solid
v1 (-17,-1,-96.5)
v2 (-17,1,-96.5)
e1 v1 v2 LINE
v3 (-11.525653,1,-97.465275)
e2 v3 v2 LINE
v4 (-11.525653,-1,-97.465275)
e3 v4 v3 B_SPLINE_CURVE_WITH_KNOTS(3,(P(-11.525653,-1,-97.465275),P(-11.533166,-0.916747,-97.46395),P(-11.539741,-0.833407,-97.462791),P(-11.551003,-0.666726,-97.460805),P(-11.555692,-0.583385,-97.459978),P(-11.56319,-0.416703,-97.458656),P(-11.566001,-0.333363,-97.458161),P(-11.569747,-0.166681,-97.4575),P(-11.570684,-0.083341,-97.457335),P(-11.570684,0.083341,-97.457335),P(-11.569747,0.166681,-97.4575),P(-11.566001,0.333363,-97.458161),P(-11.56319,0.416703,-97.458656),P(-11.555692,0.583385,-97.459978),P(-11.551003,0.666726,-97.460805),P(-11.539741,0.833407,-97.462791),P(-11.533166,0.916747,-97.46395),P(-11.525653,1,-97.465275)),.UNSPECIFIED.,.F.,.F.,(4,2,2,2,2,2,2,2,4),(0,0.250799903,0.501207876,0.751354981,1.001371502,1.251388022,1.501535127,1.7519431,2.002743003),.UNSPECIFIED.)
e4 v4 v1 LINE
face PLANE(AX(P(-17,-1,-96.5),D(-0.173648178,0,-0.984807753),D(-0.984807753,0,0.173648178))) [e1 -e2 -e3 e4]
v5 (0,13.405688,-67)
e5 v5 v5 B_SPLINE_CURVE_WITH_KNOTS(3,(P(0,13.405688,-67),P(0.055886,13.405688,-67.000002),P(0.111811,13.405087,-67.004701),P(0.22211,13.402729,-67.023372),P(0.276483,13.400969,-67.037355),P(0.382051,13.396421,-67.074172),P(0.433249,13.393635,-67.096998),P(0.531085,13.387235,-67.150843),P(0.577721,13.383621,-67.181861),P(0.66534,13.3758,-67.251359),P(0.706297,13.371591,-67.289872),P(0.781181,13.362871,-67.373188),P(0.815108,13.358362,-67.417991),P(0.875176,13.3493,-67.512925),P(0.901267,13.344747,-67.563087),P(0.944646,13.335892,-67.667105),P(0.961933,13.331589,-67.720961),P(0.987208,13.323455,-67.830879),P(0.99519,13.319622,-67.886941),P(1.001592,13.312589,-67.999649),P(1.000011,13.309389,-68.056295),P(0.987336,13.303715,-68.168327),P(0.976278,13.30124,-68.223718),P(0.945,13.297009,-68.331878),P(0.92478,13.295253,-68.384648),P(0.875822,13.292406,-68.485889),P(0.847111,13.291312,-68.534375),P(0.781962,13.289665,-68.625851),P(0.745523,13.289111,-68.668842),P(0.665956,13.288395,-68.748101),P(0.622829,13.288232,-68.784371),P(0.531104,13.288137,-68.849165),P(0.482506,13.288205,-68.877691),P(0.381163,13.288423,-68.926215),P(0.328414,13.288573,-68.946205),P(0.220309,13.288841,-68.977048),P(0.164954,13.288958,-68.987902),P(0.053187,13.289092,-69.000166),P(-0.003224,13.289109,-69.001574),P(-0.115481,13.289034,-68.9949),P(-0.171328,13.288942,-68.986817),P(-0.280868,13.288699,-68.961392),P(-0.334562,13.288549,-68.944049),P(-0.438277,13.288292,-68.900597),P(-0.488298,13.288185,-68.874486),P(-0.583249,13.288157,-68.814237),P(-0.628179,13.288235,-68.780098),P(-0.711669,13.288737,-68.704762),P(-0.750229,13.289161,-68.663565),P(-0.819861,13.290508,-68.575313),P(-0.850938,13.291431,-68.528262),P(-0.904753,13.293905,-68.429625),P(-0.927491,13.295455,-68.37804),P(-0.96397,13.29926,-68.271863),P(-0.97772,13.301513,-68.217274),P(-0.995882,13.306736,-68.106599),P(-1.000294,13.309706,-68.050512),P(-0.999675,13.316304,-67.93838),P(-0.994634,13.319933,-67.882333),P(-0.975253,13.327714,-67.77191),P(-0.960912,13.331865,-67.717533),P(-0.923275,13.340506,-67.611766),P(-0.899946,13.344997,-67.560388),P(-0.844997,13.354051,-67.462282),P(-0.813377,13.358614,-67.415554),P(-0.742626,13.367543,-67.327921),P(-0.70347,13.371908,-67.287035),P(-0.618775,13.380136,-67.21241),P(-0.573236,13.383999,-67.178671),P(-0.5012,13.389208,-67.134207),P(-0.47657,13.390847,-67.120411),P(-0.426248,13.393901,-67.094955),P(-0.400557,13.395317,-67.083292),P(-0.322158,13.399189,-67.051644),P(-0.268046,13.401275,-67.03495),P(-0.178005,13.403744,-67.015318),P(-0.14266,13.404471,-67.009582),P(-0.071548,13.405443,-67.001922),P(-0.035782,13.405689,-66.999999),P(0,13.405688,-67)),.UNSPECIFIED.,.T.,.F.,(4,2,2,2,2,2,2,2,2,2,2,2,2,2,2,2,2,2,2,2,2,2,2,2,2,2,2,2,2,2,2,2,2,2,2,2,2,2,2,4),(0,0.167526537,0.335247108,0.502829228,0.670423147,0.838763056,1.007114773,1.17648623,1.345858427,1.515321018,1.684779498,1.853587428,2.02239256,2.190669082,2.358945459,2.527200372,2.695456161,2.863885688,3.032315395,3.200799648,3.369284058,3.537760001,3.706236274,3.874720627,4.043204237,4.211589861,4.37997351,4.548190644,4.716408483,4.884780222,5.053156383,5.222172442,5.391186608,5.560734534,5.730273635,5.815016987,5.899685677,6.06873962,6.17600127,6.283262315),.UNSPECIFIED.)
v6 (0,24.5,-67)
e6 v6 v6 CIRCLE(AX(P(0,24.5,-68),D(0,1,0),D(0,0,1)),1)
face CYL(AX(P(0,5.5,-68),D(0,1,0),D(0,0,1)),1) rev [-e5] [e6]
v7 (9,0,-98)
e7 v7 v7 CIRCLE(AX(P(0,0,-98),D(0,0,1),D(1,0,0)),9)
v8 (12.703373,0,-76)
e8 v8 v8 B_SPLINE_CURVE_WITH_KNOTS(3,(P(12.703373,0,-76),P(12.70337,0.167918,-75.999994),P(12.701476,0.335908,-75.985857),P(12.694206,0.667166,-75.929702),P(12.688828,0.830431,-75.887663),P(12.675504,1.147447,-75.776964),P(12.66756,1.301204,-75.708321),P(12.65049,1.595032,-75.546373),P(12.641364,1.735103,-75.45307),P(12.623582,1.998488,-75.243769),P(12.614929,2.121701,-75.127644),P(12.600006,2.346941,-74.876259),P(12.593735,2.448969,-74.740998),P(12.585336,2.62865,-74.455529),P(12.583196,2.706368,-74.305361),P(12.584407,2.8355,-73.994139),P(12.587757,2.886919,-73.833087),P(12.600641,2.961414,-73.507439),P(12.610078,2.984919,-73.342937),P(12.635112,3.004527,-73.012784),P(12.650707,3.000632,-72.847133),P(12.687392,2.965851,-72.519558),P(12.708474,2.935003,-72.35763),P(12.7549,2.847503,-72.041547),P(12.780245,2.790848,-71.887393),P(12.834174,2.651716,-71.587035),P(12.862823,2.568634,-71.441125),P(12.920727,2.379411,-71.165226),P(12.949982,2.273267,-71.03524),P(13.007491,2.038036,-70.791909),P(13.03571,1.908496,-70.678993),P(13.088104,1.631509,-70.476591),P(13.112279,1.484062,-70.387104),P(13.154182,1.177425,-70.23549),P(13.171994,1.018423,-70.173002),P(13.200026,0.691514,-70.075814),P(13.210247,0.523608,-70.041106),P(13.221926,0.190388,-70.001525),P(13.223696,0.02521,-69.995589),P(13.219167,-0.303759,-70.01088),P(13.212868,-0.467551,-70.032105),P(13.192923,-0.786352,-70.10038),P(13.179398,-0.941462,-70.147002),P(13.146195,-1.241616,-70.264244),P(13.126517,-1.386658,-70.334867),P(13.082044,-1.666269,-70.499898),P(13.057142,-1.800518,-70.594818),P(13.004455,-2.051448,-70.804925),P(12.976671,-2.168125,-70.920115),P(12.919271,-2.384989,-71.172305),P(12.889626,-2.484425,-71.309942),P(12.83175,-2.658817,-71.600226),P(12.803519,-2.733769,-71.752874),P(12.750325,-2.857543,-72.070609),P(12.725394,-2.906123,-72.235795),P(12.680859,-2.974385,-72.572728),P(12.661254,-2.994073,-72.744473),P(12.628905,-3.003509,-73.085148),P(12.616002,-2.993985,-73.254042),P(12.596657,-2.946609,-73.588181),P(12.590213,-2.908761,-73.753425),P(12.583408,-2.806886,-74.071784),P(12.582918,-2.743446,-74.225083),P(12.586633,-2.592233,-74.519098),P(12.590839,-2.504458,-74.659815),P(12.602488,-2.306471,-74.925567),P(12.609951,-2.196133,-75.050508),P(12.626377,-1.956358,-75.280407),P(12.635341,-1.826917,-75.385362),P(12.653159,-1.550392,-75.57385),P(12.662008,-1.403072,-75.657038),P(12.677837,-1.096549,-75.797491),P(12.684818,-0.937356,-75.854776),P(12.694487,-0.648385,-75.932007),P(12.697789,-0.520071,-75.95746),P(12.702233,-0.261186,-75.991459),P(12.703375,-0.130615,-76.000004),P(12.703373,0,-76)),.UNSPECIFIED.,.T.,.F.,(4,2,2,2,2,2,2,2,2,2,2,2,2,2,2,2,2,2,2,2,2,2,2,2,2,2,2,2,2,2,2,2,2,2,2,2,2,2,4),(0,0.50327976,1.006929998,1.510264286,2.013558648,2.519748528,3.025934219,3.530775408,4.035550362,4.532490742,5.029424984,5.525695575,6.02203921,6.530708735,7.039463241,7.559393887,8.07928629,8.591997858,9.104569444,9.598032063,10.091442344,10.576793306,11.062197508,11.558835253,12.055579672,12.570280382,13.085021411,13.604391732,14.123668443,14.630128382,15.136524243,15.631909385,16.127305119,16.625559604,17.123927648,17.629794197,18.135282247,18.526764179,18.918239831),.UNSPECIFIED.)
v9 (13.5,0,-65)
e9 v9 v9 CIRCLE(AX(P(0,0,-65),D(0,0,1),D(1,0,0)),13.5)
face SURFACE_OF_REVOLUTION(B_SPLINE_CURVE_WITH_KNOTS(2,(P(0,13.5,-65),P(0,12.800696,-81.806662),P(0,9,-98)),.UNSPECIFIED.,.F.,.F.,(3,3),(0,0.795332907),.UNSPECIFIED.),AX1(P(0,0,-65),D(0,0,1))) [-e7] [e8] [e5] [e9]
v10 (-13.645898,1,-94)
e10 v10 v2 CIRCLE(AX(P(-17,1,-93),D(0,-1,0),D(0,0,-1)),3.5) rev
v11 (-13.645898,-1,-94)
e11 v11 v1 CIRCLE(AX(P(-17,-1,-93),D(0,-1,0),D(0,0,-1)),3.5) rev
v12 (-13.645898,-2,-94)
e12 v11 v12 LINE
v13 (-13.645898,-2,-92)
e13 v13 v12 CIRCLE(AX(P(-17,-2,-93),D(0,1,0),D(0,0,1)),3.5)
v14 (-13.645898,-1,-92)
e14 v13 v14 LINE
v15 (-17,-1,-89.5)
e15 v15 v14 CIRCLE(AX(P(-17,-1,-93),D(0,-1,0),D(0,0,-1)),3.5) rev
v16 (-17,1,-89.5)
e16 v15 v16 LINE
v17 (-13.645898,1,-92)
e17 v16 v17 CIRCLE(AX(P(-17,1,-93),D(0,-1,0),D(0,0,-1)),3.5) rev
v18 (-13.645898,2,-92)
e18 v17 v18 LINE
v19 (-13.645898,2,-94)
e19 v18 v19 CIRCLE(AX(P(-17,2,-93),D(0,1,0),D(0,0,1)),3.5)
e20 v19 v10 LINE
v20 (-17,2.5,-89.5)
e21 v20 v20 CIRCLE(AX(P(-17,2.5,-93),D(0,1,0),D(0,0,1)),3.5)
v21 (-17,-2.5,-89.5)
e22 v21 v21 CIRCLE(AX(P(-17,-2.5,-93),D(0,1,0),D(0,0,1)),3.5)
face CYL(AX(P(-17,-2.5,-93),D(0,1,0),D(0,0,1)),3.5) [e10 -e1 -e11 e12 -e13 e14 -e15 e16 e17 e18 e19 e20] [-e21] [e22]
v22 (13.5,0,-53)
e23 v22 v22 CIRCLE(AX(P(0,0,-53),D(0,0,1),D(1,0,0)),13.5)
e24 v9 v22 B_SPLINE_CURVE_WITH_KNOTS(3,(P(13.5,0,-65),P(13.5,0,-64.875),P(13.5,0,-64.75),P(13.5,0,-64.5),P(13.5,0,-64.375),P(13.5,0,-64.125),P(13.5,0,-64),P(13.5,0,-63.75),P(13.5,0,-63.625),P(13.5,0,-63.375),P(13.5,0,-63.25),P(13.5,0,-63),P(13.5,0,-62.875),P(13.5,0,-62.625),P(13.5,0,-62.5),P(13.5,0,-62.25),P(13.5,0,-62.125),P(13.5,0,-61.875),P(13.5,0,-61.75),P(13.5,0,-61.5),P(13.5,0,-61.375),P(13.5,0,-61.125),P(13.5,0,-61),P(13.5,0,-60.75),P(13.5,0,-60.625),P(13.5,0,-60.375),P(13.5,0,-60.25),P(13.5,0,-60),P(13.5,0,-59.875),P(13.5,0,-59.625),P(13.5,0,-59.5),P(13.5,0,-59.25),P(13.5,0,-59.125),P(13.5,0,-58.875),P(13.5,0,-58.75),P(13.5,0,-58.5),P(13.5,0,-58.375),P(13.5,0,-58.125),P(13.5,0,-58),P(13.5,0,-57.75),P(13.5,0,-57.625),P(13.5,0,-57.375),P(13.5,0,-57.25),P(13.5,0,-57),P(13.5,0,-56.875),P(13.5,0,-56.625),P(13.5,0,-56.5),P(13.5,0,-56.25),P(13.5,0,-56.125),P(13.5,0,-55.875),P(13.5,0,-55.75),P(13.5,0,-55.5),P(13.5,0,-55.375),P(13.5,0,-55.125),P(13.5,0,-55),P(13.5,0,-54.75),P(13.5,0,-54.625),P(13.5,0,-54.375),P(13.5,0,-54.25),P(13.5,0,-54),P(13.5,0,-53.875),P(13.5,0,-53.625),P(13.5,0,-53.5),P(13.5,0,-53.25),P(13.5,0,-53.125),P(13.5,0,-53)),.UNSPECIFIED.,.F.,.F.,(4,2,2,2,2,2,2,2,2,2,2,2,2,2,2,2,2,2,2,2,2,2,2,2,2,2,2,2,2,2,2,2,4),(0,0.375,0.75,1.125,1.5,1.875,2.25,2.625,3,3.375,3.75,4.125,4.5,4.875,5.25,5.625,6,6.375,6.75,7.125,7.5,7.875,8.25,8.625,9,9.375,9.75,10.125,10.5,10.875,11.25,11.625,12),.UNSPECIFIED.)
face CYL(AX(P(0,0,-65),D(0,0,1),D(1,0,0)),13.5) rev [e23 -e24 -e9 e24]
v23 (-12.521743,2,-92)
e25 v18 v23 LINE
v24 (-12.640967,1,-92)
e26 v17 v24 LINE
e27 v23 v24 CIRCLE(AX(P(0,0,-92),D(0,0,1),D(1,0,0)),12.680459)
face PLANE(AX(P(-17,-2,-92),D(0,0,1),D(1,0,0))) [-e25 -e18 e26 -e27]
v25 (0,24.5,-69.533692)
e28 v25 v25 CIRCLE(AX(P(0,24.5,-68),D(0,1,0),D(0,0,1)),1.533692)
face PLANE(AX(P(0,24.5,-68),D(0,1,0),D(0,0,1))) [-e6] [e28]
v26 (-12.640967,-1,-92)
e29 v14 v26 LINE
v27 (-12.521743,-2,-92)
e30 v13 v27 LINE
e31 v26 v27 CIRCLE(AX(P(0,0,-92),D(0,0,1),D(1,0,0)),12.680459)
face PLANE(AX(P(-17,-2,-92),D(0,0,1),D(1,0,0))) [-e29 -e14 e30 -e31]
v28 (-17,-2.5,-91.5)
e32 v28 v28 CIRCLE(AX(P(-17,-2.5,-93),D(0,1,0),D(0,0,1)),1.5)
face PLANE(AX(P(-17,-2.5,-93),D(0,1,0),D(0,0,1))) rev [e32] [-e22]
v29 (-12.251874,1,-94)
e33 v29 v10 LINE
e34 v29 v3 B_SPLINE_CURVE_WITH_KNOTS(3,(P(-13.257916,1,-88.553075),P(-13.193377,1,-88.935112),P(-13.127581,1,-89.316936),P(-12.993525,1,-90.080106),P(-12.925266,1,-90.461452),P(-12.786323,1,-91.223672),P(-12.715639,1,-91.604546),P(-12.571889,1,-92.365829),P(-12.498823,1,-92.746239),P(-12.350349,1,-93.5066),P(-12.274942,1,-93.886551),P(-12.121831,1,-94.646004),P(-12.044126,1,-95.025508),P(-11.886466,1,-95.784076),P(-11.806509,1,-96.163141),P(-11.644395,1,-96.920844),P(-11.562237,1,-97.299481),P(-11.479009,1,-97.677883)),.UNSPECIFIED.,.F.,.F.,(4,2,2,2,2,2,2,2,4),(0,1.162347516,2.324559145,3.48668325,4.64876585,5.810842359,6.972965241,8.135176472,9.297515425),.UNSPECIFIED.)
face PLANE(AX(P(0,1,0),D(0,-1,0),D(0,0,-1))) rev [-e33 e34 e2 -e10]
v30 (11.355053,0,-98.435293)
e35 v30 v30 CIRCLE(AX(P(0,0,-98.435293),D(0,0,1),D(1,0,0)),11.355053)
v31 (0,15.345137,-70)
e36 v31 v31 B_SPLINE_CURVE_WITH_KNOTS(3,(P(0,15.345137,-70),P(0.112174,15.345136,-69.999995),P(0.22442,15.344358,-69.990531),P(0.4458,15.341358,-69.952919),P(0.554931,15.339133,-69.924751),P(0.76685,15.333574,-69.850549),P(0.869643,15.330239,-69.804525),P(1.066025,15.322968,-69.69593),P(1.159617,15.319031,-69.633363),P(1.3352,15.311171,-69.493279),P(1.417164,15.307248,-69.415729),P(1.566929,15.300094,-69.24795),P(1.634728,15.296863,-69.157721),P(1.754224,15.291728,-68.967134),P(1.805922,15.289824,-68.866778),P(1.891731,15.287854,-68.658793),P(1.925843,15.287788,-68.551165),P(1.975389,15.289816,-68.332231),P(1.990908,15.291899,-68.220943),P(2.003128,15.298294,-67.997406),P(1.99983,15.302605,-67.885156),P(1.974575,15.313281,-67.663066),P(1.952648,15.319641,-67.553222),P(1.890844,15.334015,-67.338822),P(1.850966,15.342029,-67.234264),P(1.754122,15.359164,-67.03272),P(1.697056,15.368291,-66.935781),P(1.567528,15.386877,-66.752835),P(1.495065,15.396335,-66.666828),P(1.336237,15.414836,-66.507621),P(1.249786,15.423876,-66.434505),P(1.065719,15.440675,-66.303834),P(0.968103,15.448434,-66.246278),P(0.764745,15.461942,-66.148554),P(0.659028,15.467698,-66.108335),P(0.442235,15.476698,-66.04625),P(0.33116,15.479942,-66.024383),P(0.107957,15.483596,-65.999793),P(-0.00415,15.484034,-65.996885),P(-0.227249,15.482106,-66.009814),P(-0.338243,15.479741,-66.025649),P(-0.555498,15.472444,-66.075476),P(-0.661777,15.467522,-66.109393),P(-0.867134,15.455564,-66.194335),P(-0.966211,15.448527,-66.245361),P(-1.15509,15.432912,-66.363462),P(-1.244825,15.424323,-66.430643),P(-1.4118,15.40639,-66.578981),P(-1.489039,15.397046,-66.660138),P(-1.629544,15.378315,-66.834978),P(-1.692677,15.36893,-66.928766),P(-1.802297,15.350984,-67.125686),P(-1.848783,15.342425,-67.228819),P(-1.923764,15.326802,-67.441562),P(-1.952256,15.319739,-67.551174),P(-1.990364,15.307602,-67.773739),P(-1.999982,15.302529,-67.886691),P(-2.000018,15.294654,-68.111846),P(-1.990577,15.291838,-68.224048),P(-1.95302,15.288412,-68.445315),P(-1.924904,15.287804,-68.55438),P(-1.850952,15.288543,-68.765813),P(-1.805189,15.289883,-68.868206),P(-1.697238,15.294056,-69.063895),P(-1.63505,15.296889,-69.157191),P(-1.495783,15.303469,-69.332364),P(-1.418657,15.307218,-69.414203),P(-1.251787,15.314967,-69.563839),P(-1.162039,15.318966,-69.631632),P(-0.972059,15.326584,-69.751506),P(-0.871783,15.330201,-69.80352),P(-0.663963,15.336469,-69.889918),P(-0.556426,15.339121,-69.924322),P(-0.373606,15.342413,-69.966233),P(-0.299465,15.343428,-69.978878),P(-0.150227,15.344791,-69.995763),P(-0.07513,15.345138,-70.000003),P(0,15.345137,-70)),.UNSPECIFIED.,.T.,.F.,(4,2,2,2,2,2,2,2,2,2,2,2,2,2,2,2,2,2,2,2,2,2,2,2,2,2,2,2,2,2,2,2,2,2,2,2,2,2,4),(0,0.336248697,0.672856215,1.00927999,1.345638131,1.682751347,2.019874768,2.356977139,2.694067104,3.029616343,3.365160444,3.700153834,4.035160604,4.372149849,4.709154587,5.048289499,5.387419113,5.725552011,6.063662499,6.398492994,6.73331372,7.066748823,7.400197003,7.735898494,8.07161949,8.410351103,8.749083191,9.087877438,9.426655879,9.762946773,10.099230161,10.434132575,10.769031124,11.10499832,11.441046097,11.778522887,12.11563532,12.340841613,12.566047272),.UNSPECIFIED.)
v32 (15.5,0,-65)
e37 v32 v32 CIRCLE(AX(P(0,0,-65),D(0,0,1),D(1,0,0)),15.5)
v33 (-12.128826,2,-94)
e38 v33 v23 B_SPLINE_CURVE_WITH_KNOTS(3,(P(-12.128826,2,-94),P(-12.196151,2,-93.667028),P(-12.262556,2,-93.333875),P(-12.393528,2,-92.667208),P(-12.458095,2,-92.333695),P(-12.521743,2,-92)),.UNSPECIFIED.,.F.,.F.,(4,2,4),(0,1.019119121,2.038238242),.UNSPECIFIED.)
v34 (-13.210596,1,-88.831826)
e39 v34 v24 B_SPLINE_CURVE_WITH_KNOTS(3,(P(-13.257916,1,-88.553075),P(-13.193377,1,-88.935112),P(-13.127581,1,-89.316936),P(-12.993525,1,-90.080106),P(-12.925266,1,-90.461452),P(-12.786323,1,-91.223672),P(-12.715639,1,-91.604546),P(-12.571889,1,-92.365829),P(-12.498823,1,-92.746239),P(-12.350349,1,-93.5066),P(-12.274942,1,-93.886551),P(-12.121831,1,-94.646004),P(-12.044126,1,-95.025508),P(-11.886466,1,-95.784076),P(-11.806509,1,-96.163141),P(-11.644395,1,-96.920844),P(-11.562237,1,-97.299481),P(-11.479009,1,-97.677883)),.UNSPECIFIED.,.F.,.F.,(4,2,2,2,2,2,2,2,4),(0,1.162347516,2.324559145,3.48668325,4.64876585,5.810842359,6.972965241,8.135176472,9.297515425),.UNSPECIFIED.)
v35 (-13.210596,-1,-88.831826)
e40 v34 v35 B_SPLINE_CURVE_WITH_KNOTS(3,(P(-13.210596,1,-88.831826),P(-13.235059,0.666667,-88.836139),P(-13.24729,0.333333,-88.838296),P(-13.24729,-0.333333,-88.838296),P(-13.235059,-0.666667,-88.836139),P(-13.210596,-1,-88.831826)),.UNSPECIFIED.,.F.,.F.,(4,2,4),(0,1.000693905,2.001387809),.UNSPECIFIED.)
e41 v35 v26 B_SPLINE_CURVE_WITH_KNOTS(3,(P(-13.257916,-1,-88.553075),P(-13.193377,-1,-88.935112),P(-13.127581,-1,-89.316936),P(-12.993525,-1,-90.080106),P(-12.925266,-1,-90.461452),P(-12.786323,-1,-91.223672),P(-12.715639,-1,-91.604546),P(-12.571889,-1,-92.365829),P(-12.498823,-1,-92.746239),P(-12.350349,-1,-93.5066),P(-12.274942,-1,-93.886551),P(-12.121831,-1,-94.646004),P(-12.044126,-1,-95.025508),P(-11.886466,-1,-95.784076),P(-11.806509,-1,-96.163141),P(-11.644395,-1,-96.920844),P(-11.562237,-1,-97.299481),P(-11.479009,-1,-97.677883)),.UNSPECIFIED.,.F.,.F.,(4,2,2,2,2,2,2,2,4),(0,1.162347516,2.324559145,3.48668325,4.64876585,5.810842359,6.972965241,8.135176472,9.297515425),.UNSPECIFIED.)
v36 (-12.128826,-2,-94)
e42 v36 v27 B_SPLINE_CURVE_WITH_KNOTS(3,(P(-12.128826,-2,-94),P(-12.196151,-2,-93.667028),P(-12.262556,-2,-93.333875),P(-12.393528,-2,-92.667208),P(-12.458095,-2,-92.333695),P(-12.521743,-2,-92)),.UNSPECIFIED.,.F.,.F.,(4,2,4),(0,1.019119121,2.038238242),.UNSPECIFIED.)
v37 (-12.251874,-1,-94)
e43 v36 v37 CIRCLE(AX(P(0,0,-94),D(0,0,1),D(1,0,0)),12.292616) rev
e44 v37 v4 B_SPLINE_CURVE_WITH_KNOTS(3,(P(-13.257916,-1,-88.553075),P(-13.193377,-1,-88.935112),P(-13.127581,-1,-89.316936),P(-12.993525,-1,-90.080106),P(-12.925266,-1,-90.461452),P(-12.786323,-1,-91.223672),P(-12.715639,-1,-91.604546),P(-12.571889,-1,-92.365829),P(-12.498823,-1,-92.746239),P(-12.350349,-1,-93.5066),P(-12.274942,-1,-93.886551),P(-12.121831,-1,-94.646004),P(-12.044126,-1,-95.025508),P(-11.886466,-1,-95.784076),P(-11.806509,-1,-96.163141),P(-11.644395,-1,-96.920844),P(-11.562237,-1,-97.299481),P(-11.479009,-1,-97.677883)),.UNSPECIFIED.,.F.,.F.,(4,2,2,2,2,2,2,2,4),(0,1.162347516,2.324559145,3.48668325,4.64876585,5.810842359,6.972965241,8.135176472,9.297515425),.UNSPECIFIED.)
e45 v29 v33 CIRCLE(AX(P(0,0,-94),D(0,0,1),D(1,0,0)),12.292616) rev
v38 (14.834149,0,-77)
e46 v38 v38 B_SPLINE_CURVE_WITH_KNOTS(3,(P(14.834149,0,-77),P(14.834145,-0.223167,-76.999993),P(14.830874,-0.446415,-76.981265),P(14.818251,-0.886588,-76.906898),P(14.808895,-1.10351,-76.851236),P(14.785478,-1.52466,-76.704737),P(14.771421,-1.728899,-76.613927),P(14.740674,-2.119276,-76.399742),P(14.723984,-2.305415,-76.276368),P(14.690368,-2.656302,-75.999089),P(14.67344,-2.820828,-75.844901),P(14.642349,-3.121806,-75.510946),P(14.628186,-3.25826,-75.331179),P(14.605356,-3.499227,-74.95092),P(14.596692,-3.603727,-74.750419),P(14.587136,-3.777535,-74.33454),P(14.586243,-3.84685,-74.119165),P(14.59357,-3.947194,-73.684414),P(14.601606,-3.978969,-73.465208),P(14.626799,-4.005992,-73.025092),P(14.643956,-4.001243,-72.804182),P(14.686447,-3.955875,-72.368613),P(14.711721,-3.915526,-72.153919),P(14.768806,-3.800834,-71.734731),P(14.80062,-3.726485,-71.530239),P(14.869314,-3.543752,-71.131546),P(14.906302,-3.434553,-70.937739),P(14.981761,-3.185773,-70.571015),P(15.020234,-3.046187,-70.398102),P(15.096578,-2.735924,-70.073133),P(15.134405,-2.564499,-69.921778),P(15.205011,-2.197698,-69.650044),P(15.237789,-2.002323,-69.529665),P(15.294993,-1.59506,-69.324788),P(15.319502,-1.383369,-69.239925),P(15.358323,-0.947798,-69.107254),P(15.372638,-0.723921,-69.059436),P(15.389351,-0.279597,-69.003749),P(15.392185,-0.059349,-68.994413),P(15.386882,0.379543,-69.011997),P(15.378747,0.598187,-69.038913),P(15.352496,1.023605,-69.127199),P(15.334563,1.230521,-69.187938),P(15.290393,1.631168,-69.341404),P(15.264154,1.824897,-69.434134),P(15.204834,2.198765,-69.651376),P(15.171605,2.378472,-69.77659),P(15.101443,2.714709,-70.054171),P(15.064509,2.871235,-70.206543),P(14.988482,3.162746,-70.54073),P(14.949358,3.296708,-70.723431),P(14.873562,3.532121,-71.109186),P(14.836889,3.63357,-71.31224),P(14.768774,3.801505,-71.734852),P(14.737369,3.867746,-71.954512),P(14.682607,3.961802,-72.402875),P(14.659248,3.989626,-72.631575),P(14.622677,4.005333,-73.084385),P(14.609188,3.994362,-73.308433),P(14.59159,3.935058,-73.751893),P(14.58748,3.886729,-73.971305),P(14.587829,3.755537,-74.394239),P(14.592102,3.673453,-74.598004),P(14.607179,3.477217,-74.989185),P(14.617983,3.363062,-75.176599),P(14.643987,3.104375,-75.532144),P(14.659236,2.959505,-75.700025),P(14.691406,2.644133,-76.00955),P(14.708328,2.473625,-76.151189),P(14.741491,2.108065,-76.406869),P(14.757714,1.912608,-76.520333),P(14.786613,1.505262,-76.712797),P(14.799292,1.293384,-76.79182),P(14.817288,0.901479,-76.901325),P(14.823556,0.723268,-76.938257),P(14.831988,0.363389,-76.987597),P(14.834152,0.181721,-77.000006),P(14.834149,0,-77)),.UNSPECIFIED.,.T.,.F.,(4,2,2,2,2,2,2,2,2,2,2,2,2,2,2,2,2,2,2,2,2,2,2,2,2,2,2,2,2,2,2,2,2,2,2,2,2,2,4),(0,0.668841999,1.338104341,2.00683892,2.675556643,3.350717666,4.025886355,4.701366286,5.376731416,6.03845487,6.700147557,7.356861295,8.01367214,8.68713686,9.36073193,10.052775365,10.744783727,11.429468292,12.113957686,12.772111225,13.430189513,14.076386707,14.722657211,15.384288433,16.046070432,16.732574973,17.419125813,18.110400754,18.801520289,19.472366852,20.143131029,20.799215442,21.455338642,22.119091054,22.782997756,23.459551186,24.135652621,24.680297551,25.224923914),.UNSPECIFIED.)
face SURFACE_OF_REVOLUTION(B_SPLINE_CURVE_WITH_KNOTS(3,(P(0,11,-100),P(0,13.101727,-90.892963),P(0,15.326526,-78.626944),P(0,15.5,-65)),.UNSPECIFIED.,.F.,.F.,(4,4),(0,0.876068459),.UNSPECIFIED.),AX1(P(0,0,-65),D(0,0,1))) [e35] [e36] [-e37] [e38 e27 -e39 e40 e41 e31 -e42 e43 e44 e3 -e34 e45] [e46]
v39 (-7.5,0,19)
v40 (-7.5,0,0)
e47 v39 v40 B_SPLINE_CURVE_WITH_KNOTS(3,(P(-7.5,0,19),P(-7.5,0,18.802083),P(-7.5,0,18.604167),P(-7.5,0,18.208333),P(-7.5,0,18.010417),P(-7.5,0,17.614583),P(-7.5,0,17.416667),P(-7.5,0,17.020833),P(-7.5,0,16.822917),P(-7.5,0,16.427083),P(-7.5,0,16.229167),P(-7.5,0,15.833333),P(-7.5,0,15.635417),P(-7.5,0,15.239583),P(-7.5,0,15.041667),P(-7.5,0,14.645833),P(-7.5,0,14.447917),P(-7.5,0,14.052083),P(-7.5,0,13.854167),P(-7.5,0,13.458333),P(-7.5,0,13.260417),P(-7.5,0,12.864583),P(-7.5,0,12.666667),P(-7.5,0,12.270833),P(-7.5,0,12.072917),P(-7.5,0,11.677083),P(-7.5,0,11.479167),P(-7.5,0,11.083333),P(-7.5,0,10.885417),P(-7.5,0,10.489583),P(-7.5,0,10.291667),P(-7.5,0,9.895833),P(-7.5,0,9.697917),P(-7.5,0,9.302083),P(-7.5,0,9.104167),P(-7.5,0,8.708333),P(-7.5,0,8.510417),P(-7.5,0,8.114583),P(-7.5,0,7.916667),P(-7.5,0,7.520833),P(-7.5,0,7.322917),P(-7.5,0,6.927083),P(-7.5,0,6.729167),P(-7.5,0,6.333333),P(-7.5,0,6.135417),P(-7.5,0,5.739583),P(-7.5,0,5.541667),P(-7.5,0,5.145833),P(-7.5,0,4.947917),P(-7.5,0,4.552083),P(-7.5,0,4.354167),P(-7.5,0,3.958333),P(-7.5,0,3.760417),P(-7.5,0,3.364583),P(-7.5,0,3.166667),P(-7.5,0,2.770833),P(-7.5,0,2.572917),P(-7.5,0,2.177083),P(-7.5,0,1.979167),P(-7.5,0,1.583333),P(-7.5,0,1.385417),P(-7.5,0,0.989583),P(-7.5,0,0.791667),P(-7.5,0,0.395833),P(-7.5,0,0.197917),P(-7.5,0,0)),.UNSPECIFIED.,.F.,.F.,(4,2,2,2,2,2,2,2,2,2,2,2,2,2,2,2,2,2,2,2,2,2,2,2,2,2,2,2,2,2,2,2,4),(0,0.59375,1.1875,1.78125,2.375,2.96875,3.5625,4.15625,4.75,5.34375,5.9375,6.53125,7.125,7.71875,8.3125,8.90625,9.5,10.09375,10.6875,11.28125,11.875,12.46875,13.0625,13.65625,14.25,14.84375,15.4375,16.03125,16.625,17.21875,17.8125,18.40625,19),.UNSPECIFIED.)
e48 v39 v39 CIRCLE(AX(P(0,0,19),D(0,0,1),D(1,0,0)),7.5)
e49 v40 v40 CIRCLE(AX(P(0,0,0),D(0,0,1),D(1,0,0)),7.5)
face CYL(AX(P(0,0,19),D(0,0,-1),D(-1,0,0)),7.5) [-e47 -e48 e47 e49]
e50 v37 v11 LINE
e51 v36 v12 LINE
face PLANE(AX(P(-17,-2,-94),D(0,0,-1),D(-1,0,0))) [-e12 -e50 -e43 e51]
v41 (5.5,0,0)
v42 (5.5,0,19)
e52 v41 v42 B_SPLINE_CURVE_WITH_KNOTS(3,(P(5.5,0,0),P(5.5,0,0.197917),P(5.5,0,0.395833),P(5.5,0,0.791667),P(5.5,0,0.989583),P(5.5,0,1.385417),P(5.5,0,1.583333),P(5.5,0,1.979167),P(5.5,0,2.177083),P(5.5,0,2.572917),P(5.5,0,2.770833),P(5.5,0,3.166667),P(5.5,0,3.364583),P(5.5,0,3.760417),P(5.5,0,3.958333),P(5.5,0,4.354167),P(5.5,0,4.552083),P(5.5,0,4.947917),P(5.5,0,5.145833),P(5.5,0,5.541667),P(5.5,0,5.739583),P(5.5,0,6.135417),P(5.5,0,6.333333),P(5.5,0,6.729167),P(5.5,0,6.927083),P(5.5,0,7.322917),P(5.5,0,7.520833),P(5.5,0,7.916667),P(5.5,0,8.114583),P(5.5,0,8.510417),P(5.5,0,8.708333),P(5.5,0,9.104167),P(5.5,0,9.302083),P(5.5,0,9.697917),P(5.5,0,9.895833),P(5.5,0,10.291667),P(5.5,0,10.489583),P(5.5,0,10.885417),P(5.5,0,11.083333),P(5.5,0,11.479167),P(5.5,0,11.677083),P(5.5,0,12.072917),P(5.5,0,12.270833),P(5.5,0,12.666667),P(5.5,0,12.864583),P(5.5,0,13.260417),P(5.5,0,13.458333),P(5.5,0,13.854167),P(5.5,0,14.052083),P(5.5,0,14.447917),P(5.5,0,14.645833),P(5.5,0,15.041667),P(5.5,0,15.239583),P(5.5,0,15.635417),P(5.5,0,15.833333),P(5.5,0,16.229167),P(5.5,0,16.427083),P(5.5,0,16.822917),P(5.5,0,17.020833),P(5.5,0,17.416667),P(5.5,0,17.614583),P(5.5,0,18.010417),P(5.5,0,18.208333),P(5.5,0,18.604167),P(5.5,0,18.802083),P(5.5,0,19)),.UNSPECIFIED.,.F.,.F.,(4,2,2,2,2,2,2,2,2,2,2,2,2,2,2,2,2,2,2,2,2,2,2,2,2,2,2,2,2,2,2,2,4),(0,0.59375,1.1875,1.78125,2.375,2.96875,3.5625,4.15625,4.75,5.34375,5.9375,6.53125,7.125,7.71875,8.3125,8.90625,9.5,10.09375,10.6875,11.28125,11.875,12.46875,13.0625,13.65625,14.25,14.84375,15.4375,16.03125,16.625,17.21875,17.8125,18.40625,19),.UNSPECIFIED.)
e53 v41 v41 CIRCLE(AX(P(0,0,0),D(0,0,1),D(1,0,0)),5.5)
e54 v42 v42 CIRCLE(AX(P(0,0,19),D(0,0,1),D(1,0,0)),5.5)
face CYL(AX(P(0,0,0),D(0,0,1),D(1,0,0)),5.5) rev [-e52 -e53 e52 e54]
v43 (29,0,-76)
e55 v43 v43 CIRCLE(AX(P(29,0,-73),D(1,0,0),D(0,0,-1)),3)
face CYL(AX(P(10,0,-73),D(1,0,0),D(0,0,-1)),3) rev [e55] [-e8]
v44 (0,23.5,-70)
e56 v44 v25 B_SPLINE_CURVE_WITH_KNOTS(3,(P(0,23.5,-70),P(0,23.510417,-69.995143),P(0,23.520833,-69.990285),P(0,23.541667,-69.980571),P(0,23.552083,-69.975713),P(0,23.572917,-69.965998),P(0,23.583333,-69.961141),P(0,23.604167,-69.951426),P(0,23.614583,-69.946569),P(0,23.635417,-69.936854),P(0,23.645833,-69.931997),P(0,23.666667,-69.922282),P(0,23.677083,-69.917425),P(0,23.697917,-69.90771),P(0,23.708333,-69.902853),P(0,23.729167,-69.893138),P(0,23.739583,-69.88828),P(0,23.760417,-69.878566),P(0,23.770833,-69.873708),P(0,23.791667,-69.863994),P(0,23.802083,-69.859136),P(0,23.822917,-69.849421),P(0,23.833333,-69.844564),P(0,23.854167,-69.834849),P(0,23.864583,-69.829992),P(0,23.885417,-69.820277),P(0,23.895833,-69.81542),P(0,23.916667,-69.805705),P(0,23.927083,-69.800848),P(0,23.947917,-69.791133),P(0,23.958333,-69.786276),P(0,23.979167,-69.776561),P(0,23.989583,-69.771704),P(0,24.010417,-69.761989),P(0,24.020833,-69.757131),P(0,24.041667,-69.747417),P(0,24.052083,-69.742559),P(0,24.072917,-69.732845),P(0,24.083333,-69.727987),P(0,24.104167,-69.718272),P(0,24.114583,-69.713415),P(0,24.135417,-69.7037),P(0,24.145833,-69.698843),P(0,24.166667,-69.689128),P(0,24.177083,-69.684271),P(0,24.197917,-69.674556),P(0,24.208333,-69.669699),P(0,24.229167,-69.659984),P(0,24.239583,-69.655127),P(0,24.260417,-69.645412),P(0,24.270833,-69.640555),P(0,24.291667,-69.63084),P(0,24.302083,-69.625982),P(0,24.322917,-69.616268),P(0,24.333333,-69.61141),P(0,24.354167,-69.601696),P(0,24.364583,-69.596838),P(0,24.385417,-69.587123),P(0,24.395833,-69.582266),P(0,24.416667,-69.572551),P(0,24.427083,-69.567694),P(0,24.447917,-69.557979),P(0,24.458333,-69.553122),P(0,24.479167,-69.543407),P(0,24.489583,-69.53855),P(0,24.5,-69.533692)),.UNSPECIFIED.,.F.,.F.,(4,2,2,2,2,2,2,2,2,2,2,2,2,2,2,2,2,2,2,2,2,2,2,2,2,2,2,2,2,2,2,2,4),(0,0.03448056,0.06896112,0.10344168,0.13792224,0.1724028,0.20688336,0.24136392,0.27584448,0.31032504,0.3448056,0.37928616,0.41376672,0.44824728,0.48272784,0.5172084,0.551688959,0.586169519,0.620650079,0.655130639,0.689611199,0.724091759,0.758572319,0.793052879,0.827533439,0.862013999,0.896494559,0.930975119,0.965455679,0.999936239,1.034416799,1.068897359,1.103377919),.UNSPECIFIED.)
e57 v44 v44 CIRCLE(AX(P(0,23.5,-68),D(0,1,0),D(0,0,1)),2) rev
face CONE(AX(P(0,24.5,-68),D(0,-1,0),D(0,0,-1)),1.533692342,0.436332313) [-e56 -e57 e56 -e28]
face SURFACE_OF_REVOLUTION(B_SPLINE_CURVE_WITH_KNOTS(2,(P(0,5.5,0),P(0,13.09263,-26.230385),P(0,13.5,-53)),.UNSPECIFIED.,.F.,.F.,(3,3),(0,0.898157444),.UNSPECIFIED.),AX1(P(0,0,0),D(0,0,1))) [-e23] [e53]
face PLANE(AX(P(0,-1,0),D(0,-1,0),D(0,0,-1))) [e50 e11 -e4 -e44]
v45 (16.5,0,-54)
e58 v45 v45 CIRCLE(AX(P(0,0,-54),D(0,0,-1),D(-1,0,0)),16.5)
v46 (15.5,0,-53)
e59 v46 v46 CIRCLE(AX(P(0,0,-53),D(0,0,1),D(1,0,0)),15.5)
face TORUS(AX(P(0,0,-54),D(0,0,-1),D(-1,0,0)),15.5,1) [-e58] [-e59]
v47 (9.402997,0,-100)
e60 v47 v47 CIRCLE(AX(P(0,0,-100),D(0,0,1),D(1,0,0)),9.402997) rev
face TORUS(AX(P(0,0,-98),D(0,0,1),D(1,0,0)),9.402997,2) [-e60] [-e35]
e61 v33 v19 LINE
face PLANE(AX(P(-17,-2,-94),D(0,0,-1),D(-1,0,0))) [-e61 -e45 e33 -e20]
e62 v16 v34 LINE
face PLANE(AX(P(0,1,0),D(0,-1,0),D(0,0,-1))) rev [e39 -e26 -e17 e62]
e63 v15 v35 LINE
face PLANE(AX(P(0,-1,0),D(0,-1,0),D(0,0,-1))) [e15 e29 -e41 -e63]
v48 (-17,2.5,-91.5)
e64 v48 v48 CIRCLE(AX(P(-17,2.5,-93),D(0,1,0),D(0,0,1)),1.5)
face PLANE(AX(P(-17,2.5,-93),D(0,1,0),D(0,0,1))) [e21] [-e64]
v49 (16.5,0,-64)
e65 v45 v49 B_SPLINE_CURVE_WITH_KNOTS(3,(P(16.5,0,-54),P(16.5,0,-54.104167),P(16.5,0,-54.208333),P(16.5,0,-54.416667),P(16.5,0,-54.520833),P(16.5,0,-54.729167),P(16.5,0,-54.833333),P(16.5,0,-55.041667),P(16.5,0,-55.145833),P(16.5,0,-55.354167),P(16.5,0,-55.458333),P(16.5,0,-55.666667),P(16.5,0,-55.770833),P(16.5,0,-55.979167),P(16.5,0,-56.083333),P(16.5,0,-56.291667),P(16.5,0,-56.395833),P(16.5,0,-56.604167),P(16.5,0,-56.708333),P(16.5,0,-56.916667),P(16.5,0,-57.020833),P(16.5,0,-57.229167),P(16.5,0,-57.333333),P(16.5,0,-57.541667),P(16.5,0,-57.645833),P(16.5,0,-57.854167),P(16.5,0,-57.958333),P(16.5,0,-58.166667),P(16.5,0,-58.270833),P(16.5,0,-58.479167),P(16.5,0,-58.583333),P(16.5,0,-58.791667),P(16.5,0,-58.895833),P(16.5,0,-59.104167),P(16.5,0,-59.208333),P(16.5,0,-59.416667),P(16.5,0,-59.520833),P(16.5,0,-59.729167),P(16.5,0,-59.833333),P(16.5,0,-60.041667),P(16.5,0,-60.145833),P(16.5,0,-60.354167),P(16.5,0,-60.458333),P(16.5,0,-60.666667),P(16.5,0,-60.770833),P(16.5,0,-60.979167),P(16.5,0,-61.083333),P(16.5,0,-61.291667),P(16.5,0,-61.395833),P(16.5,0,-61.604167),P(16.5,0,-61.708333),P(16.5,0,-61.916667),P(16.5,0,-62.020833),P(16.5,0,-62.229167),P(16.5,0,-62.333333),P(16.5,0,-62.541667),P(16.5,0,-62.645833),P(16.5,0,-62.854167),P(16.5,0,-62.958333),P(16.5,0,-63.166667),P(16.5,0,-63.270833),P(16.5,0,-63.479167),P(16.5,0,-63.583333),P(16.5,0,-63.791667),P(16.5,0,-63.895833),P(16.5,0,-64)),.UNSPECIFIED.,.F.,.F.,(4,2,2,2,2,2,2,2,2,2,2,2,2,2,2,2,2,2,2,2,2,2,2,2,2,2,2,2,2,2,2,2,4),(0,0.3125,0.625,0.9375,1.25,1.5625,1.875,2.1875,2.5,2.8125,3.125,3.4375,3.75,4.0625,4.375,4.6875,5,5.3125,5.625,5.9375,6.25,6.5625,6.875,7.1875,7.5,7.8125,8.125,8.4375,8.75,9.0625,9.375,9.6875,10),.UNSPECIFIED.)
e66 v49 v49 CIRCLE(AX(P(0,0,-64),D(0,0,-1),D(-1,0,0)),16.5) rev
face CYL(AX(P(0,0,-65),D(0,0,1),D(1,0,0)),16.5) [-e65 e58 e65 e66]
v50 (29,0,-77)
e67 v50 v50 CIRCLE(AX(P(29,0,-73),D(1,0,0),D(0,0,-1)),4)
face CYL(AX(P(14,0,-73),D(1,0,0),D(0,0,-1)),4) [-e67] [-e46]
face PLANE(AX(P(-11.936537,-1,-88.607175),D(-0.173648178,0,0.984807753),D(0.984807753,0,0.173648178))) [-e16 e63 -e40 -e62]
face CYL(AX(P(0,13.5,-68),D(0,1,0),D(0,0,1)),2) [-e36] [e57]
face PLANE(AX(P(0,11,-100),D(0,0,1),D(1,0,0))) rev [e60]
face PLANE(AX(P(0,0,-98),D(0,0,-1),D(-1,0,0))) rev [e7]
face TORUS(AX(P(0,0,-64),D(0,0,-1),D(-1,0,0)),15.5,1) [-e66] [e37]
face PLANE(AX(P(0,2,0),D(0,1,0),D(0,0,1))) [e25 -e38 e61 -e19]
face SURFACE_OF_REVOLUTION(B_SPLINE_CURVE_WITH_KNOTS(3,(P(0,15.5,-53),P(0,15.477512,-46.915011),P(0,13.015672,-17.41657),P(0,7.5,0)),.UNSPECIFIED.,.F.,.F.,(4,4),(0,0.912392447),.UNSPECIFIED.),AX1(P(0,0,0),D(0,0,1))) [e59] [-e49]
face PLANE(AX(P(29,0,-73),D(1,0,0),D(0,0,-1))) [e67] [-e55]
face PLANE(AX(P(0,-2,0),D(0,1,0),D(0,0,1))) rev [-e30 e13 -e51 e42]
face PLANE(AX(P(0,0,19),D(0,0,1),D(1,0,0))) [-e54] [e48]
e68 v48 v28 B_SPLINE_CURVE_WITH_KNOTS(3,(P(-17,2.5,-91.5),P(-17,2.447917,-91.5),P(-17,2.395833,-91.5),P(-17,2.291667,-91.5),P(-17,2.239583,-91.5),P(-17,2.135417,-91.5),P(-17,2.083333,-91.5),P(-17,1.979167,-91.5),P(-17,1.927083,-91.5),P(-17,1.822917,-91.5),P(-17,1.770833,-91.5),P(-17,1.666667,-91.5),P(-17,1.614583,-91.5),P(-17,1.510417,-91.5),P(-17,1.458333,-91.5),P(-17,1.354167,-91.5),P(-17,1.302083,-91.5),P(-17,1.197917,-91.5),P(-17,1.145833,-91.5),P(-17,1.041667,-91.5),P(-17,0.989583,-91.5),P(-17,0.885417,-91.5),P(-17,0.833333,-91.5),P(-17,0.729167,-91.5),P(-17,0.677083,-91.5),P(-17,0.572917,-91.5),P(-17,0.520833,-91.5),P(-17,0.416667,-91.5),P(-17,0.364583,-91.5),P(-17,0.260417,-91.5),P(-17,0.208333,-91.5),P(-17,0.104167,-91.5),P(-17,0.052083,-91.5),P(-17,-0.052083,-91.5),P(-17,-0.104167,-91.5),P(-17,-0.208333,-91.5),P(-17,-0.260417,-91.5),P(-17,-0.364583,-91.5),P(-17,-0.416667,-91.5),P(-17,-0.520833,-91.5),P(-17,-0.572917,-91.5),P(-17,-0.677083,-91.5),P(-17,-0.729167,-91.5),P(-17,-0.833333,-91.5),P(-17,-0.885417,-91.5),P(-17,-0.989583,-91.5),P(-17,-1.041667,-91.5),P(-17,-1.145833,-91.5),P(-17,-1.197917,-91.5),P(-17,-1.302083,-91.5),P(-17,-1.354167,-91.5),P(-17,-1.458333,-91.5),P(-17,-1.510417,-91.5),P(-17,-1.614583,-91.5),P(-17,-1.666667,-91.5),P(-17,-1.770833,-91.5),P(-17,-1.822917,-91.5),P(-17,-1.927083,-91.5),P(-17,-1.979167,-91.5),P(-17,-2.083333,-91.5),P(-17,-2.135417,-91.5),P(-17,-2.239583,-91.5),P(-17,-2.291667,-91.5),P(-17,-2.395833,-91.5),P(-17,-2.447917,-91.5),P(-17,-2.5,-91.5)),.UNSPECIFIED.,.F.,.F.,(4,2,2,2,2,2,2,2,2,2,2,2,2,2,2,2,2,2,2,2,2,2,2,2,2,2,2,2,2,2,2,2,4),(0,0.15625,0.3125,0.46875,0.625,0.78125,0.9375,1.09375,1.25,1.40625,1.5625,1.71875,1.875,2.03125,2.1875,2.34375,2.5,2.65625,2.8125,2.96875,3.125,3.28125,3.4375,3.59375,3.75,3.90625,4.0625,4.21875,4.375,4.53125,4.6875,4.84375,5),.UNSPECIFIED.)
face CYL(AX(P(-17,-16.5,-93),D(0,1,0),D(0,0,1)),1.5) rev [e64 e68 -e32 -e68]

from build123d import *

# Parameters (mm, degrees)
SKETCH1_R                 = 7.5
BOSS_EXTRUDE1_DEPTH       = 19
SKETCH5_R                 = 16.5
SKETCH5_R_2               = 13.5
BOSS_EXTRUDE3_DEPTH       = 12
SKETCH9_R                 = 4
BOSS_EXTRUDE4_DEPTH       = 15
SKETCH10_R                = 2
BOSS_EXTRUDE5_DEPTH       = 11
CHAMFER1_SIZE             = 1
CHAMFER1_SIZE2            = 0.466307658
FILLET1_R                 = 1
FILLET2_R                 = 2
SKETCH15_R                = 5.5
CUT_EXTRUDE1_DEPTH        = 19
SKETCH17_R                = 1
CUT_EXTRUDE2_DEPTH        = 19
SKETCH16_R                = 3
CUT_EXTRUDE3_DEPTH        = 19
BOSS_EXTRUDE9_DEPTH       = 2.5
BOSS_EXTRUDE9_DEPTH_BACK  = 2.5
SKETCH22_R                = 3.5
BOSS_EXTRUDE10_DEPTH      = 2
BOSS_EXTRUDE10_DEPTH_BACK = 2
SKETCH23_W                = 6
SKETCH23_H                = 2
BOSS_EXTRUDE12_DEPTH      = 1
BOSS_EXTRUDE12_DEPTH_BACK = 1
SKETCH26_R                = 1.5
CUT_EXTRUDE5_DEPTH        = 107.418983411


with BuildPart() as part:
    # Sketch1 → Boss-Extrude1 (new body)
    with BuildSketch(Plane.XY):
        Circle(SKETCH1_R)
    extrude(amount=BOSS_EXTRUDE1_DEPTH)

    # Sketch3 → Revolve1 (revolve)
    with BuildSketch(Plane(origin=(0, 0, 0), x_dir=(0, 0, -1), z_dir=(1, 0, 0))):
        with BuildLine():
            Line((0, 7.5), (0, 5.5))
            add(Edge.make_bspline(
                [(0, 5.5), (26.230385201, 13.092629778), (53, 13.5)],
                knots=[0, 0, 0, 0.898157444, 0.898157444, 0.898157444], degree=2))
            Line((53, 13.5), (53, 15.5))
            add(Edge.make_bspline(
                [(0, 7.5), (17.416569759, 13.015671552), (46.915011064, 15.477511864), (53, 15.5)],
                knots=[0, 0, 0, 0, 0.912392447, 0.912392447, 0.912392447, 0.912392447], degree=3))
        make_face()
    revolve(axis=Axis((0, 0, 0), (0, 0, -1)))

    # Sketch5 → Boss-Extrude3 (add)
    with BuildSketch(Plane(origin=(0, 0, -53), x_dir=(-1, 0, 0), z_dir=(0, 0, -1))):
        Circle(SKETCH5_R)
        with Locations(Location((0, 0, 0), (0, 0, 180))):
            Circle(SKETCH5_R_2, mode=Mode.SUBTRACT)
    extrude(amount=BOSS_EXTRUDE3_DEPTH)

    # Sketch8 → Revolve2 (revolve)
    with BuildSketch(Plane(origin=(0, 0, 0), x_dir=(0, 0, -1), z_dir=(1, 0, 0))):
        with BuildLine():
            Line((65, 15.5), (65, 13.5))
            add(Edge.make_bspline(
                [(65, 13.5), (81.806661651, 12.800695989), (98, 9)],
                knots=[0, 0, 0, 0.795332907, 0.795332907, 0.795332907], degree=2))
            Line((98, 9), (98, 0))
            Line((98, 0), (100, 0))
            Line((100, 0), (100, 11))
            add(Edge.make_bspline(
                [(65, 15.5), (78.626944165, 15.326525568), (90.89296342, 13.101726586), (100, 11)],
                knots=[0, 0, 0, 0, 0.876068459, 0.876068459, 0.876068459, 0.876068459], degree=3))
        make_face()
    revolve(axis=Axis((0, 0, -65), (0, 0, -1)))

    # Sketch9 → Boss-Extrude4 (add)
    with BuildSketch(Plane(origin=(29, 0, 0), x_dir=(0, 0, -1), z_dir=(1, 0, 0))):
        with Locations((73, 0)):
            Circle(SKETCH9_R)
    extrude(amount=-BOSS_EXTRUDE4_DEPTH)

    # Sketch10 → Boss-Extrude5 (add)
    with BuildSketch(Plane(origin=(0, 24.5, 0), x_dir=(1, 0, 0), z_dir=(0, 1, 0))):
        with Locations(Location((0, 68, 0), (0, 0, 270))):
            Circle(SKETCH10_R)
    extrude(amount=-BOSS_EXTRUDE5_DEPTH)

    # Chamfer1
    chamfer1_edges = [part.edges().sort_by_distance(p)[0] for p in [
        (0, 24.5, -70),
    ]]
    chamfer1_side = [part.faces().sort_by_distance(p)[0] for p in [
        (0, 19.893621866, -70),
    ]]
    chamfer(chamfer1_edges, length=CHAMFER1_SIZE, length2=CHAMFER1_SIZE2, reference=chamfer1_side[0])

    # Fillet1
    fillet1_edges = [part.edges().sort_by_distance(p)[0] for p in [
        (16.5, 0, -65),
        (16.5, 0, -53),
    ]]
    fillet(fillet1_edges, radius=FILLET1_R - 0.0001)  # a hair under: the kernel refuses the full size

    # Fillet2
    fillet2_edges = [part.edges().sort_by_distance(p)[0] for p in [
        (0, -11, -100),
    ]]
    fillet(fillet2_edges, radius=FILLET2_R)

    # Sketch15 → Cut-Extrude1 (cut)
    with BuildSketch(Plane.XY.offset(19)):
        Circle(SKETCH15_R)
    extrude(amount=-CUT_EXTRUDE1_DEPTH, mode=Mode.SUBTRACT)

    # Sketch17 → Cut-Extrude2 (cut)
    with BuildSketch(Plane(origin=(0, 24.5, 0), x_dir=(1, 0, 0), z_dir=(0, 1, 0))):
        with Locations(Location((0, 68, 0), (0, 0, 270))):
            Circle(SKETCH17_R)
    extrude(amount=-CUT_EXTRUDE2_DEPTH, mode=Mode.SUBTRACT)

    # Sketch16 → Cut-Extrude3 (cut)
    with BuildSketch(Plane(origin=(29, 0, 0), x_dir=(0, 0, -1), z_dir=(1, 0, 0))):
        with Locations((73, 0)):
            Circle(SKETCH16_R)
    extrude(amount=-CUT_EXTRUDE3_DEPTH, mode=Mode.SUBTRACT)



with BuildPart() as body_2:
    # Sketch22 → Boss-Extrude9 (new, two sides: drawn at the far end of the back side and taken through both)
    with BuildSketch(Plane(origin=(0, 0, 0), x_dir=(1, 0, 0), z_dir=(0, 1, 0)).offset(-BOSS_EXTRUDE9_DEPTH_BACK)):
        with Locations(Location((-17, 93, 0), (0, 0, 270))):
            Circle(SKETCH22_R)
    extrude(amount=BOSS_EXTRUDE9_DEPTH + BOSS_EXTRUDE9_DEPTH_BACK)


with BuildPart() as part_1:
    add(part.part)

    add(body_2.part)  # Boss-Extrude10 merges body 2
    # Sketch23 → Boss-Extrude10 (add, two sides: drawn at the far end of the back side and taken through both)
    with BuildSketch(Plane(origin=(0, 0, 0), x_dir=(1, 0, 0), z_dir=(0, 1, 0)).offset(-BOSS_EXTRUDE10_DEPTH_BACK)):
        with Locations((-14, 93)):
            Rectangle(SKETCH23_W, SKETCH23_H)
    extrude(amount=BOSS_EXTRUDE10_DEPTH + BOSS_EXTRUDE10_DEPTH_BACK)

    # Sketch25 → Boss-Extrude12 (add, two sides: drawn at the far end of the back side and taken through both)
    with BuildSketch(Plane(origin=(0, 0, 0), x_dir=(1, 0, 0), z_dir=(0, 1, 0)).offset(-BOSS_EXTRUDE12_DEPTH_BACK)):
        Polygon((-17, 96.5), (-10.626707162, 97.623783483), (-11.936536901, 88.60717484), (-17, 89.5), align=None)
    extrude(amount=BOSS_EXTRUDE12_DEPTH + BOSS_EXTRUDE12_DEPTH_BACK)

    # Sketch26 → Cut-Extrude5 (cut, through all)
    with BuildSketch(Plane(origin=(0, 2.5, 0), x_dir=(1, 0, 0), z_dir=(0, 1, 0))):
        with Locations(Location((-17, 93, 0), (0, 0, 270))):
            Circle(SKETCH26_R)
    extrude(amount=-CUT_EXTRUDE5_DEPTH, mode=Mode.SUBTRACT)


solid = part_1.part
